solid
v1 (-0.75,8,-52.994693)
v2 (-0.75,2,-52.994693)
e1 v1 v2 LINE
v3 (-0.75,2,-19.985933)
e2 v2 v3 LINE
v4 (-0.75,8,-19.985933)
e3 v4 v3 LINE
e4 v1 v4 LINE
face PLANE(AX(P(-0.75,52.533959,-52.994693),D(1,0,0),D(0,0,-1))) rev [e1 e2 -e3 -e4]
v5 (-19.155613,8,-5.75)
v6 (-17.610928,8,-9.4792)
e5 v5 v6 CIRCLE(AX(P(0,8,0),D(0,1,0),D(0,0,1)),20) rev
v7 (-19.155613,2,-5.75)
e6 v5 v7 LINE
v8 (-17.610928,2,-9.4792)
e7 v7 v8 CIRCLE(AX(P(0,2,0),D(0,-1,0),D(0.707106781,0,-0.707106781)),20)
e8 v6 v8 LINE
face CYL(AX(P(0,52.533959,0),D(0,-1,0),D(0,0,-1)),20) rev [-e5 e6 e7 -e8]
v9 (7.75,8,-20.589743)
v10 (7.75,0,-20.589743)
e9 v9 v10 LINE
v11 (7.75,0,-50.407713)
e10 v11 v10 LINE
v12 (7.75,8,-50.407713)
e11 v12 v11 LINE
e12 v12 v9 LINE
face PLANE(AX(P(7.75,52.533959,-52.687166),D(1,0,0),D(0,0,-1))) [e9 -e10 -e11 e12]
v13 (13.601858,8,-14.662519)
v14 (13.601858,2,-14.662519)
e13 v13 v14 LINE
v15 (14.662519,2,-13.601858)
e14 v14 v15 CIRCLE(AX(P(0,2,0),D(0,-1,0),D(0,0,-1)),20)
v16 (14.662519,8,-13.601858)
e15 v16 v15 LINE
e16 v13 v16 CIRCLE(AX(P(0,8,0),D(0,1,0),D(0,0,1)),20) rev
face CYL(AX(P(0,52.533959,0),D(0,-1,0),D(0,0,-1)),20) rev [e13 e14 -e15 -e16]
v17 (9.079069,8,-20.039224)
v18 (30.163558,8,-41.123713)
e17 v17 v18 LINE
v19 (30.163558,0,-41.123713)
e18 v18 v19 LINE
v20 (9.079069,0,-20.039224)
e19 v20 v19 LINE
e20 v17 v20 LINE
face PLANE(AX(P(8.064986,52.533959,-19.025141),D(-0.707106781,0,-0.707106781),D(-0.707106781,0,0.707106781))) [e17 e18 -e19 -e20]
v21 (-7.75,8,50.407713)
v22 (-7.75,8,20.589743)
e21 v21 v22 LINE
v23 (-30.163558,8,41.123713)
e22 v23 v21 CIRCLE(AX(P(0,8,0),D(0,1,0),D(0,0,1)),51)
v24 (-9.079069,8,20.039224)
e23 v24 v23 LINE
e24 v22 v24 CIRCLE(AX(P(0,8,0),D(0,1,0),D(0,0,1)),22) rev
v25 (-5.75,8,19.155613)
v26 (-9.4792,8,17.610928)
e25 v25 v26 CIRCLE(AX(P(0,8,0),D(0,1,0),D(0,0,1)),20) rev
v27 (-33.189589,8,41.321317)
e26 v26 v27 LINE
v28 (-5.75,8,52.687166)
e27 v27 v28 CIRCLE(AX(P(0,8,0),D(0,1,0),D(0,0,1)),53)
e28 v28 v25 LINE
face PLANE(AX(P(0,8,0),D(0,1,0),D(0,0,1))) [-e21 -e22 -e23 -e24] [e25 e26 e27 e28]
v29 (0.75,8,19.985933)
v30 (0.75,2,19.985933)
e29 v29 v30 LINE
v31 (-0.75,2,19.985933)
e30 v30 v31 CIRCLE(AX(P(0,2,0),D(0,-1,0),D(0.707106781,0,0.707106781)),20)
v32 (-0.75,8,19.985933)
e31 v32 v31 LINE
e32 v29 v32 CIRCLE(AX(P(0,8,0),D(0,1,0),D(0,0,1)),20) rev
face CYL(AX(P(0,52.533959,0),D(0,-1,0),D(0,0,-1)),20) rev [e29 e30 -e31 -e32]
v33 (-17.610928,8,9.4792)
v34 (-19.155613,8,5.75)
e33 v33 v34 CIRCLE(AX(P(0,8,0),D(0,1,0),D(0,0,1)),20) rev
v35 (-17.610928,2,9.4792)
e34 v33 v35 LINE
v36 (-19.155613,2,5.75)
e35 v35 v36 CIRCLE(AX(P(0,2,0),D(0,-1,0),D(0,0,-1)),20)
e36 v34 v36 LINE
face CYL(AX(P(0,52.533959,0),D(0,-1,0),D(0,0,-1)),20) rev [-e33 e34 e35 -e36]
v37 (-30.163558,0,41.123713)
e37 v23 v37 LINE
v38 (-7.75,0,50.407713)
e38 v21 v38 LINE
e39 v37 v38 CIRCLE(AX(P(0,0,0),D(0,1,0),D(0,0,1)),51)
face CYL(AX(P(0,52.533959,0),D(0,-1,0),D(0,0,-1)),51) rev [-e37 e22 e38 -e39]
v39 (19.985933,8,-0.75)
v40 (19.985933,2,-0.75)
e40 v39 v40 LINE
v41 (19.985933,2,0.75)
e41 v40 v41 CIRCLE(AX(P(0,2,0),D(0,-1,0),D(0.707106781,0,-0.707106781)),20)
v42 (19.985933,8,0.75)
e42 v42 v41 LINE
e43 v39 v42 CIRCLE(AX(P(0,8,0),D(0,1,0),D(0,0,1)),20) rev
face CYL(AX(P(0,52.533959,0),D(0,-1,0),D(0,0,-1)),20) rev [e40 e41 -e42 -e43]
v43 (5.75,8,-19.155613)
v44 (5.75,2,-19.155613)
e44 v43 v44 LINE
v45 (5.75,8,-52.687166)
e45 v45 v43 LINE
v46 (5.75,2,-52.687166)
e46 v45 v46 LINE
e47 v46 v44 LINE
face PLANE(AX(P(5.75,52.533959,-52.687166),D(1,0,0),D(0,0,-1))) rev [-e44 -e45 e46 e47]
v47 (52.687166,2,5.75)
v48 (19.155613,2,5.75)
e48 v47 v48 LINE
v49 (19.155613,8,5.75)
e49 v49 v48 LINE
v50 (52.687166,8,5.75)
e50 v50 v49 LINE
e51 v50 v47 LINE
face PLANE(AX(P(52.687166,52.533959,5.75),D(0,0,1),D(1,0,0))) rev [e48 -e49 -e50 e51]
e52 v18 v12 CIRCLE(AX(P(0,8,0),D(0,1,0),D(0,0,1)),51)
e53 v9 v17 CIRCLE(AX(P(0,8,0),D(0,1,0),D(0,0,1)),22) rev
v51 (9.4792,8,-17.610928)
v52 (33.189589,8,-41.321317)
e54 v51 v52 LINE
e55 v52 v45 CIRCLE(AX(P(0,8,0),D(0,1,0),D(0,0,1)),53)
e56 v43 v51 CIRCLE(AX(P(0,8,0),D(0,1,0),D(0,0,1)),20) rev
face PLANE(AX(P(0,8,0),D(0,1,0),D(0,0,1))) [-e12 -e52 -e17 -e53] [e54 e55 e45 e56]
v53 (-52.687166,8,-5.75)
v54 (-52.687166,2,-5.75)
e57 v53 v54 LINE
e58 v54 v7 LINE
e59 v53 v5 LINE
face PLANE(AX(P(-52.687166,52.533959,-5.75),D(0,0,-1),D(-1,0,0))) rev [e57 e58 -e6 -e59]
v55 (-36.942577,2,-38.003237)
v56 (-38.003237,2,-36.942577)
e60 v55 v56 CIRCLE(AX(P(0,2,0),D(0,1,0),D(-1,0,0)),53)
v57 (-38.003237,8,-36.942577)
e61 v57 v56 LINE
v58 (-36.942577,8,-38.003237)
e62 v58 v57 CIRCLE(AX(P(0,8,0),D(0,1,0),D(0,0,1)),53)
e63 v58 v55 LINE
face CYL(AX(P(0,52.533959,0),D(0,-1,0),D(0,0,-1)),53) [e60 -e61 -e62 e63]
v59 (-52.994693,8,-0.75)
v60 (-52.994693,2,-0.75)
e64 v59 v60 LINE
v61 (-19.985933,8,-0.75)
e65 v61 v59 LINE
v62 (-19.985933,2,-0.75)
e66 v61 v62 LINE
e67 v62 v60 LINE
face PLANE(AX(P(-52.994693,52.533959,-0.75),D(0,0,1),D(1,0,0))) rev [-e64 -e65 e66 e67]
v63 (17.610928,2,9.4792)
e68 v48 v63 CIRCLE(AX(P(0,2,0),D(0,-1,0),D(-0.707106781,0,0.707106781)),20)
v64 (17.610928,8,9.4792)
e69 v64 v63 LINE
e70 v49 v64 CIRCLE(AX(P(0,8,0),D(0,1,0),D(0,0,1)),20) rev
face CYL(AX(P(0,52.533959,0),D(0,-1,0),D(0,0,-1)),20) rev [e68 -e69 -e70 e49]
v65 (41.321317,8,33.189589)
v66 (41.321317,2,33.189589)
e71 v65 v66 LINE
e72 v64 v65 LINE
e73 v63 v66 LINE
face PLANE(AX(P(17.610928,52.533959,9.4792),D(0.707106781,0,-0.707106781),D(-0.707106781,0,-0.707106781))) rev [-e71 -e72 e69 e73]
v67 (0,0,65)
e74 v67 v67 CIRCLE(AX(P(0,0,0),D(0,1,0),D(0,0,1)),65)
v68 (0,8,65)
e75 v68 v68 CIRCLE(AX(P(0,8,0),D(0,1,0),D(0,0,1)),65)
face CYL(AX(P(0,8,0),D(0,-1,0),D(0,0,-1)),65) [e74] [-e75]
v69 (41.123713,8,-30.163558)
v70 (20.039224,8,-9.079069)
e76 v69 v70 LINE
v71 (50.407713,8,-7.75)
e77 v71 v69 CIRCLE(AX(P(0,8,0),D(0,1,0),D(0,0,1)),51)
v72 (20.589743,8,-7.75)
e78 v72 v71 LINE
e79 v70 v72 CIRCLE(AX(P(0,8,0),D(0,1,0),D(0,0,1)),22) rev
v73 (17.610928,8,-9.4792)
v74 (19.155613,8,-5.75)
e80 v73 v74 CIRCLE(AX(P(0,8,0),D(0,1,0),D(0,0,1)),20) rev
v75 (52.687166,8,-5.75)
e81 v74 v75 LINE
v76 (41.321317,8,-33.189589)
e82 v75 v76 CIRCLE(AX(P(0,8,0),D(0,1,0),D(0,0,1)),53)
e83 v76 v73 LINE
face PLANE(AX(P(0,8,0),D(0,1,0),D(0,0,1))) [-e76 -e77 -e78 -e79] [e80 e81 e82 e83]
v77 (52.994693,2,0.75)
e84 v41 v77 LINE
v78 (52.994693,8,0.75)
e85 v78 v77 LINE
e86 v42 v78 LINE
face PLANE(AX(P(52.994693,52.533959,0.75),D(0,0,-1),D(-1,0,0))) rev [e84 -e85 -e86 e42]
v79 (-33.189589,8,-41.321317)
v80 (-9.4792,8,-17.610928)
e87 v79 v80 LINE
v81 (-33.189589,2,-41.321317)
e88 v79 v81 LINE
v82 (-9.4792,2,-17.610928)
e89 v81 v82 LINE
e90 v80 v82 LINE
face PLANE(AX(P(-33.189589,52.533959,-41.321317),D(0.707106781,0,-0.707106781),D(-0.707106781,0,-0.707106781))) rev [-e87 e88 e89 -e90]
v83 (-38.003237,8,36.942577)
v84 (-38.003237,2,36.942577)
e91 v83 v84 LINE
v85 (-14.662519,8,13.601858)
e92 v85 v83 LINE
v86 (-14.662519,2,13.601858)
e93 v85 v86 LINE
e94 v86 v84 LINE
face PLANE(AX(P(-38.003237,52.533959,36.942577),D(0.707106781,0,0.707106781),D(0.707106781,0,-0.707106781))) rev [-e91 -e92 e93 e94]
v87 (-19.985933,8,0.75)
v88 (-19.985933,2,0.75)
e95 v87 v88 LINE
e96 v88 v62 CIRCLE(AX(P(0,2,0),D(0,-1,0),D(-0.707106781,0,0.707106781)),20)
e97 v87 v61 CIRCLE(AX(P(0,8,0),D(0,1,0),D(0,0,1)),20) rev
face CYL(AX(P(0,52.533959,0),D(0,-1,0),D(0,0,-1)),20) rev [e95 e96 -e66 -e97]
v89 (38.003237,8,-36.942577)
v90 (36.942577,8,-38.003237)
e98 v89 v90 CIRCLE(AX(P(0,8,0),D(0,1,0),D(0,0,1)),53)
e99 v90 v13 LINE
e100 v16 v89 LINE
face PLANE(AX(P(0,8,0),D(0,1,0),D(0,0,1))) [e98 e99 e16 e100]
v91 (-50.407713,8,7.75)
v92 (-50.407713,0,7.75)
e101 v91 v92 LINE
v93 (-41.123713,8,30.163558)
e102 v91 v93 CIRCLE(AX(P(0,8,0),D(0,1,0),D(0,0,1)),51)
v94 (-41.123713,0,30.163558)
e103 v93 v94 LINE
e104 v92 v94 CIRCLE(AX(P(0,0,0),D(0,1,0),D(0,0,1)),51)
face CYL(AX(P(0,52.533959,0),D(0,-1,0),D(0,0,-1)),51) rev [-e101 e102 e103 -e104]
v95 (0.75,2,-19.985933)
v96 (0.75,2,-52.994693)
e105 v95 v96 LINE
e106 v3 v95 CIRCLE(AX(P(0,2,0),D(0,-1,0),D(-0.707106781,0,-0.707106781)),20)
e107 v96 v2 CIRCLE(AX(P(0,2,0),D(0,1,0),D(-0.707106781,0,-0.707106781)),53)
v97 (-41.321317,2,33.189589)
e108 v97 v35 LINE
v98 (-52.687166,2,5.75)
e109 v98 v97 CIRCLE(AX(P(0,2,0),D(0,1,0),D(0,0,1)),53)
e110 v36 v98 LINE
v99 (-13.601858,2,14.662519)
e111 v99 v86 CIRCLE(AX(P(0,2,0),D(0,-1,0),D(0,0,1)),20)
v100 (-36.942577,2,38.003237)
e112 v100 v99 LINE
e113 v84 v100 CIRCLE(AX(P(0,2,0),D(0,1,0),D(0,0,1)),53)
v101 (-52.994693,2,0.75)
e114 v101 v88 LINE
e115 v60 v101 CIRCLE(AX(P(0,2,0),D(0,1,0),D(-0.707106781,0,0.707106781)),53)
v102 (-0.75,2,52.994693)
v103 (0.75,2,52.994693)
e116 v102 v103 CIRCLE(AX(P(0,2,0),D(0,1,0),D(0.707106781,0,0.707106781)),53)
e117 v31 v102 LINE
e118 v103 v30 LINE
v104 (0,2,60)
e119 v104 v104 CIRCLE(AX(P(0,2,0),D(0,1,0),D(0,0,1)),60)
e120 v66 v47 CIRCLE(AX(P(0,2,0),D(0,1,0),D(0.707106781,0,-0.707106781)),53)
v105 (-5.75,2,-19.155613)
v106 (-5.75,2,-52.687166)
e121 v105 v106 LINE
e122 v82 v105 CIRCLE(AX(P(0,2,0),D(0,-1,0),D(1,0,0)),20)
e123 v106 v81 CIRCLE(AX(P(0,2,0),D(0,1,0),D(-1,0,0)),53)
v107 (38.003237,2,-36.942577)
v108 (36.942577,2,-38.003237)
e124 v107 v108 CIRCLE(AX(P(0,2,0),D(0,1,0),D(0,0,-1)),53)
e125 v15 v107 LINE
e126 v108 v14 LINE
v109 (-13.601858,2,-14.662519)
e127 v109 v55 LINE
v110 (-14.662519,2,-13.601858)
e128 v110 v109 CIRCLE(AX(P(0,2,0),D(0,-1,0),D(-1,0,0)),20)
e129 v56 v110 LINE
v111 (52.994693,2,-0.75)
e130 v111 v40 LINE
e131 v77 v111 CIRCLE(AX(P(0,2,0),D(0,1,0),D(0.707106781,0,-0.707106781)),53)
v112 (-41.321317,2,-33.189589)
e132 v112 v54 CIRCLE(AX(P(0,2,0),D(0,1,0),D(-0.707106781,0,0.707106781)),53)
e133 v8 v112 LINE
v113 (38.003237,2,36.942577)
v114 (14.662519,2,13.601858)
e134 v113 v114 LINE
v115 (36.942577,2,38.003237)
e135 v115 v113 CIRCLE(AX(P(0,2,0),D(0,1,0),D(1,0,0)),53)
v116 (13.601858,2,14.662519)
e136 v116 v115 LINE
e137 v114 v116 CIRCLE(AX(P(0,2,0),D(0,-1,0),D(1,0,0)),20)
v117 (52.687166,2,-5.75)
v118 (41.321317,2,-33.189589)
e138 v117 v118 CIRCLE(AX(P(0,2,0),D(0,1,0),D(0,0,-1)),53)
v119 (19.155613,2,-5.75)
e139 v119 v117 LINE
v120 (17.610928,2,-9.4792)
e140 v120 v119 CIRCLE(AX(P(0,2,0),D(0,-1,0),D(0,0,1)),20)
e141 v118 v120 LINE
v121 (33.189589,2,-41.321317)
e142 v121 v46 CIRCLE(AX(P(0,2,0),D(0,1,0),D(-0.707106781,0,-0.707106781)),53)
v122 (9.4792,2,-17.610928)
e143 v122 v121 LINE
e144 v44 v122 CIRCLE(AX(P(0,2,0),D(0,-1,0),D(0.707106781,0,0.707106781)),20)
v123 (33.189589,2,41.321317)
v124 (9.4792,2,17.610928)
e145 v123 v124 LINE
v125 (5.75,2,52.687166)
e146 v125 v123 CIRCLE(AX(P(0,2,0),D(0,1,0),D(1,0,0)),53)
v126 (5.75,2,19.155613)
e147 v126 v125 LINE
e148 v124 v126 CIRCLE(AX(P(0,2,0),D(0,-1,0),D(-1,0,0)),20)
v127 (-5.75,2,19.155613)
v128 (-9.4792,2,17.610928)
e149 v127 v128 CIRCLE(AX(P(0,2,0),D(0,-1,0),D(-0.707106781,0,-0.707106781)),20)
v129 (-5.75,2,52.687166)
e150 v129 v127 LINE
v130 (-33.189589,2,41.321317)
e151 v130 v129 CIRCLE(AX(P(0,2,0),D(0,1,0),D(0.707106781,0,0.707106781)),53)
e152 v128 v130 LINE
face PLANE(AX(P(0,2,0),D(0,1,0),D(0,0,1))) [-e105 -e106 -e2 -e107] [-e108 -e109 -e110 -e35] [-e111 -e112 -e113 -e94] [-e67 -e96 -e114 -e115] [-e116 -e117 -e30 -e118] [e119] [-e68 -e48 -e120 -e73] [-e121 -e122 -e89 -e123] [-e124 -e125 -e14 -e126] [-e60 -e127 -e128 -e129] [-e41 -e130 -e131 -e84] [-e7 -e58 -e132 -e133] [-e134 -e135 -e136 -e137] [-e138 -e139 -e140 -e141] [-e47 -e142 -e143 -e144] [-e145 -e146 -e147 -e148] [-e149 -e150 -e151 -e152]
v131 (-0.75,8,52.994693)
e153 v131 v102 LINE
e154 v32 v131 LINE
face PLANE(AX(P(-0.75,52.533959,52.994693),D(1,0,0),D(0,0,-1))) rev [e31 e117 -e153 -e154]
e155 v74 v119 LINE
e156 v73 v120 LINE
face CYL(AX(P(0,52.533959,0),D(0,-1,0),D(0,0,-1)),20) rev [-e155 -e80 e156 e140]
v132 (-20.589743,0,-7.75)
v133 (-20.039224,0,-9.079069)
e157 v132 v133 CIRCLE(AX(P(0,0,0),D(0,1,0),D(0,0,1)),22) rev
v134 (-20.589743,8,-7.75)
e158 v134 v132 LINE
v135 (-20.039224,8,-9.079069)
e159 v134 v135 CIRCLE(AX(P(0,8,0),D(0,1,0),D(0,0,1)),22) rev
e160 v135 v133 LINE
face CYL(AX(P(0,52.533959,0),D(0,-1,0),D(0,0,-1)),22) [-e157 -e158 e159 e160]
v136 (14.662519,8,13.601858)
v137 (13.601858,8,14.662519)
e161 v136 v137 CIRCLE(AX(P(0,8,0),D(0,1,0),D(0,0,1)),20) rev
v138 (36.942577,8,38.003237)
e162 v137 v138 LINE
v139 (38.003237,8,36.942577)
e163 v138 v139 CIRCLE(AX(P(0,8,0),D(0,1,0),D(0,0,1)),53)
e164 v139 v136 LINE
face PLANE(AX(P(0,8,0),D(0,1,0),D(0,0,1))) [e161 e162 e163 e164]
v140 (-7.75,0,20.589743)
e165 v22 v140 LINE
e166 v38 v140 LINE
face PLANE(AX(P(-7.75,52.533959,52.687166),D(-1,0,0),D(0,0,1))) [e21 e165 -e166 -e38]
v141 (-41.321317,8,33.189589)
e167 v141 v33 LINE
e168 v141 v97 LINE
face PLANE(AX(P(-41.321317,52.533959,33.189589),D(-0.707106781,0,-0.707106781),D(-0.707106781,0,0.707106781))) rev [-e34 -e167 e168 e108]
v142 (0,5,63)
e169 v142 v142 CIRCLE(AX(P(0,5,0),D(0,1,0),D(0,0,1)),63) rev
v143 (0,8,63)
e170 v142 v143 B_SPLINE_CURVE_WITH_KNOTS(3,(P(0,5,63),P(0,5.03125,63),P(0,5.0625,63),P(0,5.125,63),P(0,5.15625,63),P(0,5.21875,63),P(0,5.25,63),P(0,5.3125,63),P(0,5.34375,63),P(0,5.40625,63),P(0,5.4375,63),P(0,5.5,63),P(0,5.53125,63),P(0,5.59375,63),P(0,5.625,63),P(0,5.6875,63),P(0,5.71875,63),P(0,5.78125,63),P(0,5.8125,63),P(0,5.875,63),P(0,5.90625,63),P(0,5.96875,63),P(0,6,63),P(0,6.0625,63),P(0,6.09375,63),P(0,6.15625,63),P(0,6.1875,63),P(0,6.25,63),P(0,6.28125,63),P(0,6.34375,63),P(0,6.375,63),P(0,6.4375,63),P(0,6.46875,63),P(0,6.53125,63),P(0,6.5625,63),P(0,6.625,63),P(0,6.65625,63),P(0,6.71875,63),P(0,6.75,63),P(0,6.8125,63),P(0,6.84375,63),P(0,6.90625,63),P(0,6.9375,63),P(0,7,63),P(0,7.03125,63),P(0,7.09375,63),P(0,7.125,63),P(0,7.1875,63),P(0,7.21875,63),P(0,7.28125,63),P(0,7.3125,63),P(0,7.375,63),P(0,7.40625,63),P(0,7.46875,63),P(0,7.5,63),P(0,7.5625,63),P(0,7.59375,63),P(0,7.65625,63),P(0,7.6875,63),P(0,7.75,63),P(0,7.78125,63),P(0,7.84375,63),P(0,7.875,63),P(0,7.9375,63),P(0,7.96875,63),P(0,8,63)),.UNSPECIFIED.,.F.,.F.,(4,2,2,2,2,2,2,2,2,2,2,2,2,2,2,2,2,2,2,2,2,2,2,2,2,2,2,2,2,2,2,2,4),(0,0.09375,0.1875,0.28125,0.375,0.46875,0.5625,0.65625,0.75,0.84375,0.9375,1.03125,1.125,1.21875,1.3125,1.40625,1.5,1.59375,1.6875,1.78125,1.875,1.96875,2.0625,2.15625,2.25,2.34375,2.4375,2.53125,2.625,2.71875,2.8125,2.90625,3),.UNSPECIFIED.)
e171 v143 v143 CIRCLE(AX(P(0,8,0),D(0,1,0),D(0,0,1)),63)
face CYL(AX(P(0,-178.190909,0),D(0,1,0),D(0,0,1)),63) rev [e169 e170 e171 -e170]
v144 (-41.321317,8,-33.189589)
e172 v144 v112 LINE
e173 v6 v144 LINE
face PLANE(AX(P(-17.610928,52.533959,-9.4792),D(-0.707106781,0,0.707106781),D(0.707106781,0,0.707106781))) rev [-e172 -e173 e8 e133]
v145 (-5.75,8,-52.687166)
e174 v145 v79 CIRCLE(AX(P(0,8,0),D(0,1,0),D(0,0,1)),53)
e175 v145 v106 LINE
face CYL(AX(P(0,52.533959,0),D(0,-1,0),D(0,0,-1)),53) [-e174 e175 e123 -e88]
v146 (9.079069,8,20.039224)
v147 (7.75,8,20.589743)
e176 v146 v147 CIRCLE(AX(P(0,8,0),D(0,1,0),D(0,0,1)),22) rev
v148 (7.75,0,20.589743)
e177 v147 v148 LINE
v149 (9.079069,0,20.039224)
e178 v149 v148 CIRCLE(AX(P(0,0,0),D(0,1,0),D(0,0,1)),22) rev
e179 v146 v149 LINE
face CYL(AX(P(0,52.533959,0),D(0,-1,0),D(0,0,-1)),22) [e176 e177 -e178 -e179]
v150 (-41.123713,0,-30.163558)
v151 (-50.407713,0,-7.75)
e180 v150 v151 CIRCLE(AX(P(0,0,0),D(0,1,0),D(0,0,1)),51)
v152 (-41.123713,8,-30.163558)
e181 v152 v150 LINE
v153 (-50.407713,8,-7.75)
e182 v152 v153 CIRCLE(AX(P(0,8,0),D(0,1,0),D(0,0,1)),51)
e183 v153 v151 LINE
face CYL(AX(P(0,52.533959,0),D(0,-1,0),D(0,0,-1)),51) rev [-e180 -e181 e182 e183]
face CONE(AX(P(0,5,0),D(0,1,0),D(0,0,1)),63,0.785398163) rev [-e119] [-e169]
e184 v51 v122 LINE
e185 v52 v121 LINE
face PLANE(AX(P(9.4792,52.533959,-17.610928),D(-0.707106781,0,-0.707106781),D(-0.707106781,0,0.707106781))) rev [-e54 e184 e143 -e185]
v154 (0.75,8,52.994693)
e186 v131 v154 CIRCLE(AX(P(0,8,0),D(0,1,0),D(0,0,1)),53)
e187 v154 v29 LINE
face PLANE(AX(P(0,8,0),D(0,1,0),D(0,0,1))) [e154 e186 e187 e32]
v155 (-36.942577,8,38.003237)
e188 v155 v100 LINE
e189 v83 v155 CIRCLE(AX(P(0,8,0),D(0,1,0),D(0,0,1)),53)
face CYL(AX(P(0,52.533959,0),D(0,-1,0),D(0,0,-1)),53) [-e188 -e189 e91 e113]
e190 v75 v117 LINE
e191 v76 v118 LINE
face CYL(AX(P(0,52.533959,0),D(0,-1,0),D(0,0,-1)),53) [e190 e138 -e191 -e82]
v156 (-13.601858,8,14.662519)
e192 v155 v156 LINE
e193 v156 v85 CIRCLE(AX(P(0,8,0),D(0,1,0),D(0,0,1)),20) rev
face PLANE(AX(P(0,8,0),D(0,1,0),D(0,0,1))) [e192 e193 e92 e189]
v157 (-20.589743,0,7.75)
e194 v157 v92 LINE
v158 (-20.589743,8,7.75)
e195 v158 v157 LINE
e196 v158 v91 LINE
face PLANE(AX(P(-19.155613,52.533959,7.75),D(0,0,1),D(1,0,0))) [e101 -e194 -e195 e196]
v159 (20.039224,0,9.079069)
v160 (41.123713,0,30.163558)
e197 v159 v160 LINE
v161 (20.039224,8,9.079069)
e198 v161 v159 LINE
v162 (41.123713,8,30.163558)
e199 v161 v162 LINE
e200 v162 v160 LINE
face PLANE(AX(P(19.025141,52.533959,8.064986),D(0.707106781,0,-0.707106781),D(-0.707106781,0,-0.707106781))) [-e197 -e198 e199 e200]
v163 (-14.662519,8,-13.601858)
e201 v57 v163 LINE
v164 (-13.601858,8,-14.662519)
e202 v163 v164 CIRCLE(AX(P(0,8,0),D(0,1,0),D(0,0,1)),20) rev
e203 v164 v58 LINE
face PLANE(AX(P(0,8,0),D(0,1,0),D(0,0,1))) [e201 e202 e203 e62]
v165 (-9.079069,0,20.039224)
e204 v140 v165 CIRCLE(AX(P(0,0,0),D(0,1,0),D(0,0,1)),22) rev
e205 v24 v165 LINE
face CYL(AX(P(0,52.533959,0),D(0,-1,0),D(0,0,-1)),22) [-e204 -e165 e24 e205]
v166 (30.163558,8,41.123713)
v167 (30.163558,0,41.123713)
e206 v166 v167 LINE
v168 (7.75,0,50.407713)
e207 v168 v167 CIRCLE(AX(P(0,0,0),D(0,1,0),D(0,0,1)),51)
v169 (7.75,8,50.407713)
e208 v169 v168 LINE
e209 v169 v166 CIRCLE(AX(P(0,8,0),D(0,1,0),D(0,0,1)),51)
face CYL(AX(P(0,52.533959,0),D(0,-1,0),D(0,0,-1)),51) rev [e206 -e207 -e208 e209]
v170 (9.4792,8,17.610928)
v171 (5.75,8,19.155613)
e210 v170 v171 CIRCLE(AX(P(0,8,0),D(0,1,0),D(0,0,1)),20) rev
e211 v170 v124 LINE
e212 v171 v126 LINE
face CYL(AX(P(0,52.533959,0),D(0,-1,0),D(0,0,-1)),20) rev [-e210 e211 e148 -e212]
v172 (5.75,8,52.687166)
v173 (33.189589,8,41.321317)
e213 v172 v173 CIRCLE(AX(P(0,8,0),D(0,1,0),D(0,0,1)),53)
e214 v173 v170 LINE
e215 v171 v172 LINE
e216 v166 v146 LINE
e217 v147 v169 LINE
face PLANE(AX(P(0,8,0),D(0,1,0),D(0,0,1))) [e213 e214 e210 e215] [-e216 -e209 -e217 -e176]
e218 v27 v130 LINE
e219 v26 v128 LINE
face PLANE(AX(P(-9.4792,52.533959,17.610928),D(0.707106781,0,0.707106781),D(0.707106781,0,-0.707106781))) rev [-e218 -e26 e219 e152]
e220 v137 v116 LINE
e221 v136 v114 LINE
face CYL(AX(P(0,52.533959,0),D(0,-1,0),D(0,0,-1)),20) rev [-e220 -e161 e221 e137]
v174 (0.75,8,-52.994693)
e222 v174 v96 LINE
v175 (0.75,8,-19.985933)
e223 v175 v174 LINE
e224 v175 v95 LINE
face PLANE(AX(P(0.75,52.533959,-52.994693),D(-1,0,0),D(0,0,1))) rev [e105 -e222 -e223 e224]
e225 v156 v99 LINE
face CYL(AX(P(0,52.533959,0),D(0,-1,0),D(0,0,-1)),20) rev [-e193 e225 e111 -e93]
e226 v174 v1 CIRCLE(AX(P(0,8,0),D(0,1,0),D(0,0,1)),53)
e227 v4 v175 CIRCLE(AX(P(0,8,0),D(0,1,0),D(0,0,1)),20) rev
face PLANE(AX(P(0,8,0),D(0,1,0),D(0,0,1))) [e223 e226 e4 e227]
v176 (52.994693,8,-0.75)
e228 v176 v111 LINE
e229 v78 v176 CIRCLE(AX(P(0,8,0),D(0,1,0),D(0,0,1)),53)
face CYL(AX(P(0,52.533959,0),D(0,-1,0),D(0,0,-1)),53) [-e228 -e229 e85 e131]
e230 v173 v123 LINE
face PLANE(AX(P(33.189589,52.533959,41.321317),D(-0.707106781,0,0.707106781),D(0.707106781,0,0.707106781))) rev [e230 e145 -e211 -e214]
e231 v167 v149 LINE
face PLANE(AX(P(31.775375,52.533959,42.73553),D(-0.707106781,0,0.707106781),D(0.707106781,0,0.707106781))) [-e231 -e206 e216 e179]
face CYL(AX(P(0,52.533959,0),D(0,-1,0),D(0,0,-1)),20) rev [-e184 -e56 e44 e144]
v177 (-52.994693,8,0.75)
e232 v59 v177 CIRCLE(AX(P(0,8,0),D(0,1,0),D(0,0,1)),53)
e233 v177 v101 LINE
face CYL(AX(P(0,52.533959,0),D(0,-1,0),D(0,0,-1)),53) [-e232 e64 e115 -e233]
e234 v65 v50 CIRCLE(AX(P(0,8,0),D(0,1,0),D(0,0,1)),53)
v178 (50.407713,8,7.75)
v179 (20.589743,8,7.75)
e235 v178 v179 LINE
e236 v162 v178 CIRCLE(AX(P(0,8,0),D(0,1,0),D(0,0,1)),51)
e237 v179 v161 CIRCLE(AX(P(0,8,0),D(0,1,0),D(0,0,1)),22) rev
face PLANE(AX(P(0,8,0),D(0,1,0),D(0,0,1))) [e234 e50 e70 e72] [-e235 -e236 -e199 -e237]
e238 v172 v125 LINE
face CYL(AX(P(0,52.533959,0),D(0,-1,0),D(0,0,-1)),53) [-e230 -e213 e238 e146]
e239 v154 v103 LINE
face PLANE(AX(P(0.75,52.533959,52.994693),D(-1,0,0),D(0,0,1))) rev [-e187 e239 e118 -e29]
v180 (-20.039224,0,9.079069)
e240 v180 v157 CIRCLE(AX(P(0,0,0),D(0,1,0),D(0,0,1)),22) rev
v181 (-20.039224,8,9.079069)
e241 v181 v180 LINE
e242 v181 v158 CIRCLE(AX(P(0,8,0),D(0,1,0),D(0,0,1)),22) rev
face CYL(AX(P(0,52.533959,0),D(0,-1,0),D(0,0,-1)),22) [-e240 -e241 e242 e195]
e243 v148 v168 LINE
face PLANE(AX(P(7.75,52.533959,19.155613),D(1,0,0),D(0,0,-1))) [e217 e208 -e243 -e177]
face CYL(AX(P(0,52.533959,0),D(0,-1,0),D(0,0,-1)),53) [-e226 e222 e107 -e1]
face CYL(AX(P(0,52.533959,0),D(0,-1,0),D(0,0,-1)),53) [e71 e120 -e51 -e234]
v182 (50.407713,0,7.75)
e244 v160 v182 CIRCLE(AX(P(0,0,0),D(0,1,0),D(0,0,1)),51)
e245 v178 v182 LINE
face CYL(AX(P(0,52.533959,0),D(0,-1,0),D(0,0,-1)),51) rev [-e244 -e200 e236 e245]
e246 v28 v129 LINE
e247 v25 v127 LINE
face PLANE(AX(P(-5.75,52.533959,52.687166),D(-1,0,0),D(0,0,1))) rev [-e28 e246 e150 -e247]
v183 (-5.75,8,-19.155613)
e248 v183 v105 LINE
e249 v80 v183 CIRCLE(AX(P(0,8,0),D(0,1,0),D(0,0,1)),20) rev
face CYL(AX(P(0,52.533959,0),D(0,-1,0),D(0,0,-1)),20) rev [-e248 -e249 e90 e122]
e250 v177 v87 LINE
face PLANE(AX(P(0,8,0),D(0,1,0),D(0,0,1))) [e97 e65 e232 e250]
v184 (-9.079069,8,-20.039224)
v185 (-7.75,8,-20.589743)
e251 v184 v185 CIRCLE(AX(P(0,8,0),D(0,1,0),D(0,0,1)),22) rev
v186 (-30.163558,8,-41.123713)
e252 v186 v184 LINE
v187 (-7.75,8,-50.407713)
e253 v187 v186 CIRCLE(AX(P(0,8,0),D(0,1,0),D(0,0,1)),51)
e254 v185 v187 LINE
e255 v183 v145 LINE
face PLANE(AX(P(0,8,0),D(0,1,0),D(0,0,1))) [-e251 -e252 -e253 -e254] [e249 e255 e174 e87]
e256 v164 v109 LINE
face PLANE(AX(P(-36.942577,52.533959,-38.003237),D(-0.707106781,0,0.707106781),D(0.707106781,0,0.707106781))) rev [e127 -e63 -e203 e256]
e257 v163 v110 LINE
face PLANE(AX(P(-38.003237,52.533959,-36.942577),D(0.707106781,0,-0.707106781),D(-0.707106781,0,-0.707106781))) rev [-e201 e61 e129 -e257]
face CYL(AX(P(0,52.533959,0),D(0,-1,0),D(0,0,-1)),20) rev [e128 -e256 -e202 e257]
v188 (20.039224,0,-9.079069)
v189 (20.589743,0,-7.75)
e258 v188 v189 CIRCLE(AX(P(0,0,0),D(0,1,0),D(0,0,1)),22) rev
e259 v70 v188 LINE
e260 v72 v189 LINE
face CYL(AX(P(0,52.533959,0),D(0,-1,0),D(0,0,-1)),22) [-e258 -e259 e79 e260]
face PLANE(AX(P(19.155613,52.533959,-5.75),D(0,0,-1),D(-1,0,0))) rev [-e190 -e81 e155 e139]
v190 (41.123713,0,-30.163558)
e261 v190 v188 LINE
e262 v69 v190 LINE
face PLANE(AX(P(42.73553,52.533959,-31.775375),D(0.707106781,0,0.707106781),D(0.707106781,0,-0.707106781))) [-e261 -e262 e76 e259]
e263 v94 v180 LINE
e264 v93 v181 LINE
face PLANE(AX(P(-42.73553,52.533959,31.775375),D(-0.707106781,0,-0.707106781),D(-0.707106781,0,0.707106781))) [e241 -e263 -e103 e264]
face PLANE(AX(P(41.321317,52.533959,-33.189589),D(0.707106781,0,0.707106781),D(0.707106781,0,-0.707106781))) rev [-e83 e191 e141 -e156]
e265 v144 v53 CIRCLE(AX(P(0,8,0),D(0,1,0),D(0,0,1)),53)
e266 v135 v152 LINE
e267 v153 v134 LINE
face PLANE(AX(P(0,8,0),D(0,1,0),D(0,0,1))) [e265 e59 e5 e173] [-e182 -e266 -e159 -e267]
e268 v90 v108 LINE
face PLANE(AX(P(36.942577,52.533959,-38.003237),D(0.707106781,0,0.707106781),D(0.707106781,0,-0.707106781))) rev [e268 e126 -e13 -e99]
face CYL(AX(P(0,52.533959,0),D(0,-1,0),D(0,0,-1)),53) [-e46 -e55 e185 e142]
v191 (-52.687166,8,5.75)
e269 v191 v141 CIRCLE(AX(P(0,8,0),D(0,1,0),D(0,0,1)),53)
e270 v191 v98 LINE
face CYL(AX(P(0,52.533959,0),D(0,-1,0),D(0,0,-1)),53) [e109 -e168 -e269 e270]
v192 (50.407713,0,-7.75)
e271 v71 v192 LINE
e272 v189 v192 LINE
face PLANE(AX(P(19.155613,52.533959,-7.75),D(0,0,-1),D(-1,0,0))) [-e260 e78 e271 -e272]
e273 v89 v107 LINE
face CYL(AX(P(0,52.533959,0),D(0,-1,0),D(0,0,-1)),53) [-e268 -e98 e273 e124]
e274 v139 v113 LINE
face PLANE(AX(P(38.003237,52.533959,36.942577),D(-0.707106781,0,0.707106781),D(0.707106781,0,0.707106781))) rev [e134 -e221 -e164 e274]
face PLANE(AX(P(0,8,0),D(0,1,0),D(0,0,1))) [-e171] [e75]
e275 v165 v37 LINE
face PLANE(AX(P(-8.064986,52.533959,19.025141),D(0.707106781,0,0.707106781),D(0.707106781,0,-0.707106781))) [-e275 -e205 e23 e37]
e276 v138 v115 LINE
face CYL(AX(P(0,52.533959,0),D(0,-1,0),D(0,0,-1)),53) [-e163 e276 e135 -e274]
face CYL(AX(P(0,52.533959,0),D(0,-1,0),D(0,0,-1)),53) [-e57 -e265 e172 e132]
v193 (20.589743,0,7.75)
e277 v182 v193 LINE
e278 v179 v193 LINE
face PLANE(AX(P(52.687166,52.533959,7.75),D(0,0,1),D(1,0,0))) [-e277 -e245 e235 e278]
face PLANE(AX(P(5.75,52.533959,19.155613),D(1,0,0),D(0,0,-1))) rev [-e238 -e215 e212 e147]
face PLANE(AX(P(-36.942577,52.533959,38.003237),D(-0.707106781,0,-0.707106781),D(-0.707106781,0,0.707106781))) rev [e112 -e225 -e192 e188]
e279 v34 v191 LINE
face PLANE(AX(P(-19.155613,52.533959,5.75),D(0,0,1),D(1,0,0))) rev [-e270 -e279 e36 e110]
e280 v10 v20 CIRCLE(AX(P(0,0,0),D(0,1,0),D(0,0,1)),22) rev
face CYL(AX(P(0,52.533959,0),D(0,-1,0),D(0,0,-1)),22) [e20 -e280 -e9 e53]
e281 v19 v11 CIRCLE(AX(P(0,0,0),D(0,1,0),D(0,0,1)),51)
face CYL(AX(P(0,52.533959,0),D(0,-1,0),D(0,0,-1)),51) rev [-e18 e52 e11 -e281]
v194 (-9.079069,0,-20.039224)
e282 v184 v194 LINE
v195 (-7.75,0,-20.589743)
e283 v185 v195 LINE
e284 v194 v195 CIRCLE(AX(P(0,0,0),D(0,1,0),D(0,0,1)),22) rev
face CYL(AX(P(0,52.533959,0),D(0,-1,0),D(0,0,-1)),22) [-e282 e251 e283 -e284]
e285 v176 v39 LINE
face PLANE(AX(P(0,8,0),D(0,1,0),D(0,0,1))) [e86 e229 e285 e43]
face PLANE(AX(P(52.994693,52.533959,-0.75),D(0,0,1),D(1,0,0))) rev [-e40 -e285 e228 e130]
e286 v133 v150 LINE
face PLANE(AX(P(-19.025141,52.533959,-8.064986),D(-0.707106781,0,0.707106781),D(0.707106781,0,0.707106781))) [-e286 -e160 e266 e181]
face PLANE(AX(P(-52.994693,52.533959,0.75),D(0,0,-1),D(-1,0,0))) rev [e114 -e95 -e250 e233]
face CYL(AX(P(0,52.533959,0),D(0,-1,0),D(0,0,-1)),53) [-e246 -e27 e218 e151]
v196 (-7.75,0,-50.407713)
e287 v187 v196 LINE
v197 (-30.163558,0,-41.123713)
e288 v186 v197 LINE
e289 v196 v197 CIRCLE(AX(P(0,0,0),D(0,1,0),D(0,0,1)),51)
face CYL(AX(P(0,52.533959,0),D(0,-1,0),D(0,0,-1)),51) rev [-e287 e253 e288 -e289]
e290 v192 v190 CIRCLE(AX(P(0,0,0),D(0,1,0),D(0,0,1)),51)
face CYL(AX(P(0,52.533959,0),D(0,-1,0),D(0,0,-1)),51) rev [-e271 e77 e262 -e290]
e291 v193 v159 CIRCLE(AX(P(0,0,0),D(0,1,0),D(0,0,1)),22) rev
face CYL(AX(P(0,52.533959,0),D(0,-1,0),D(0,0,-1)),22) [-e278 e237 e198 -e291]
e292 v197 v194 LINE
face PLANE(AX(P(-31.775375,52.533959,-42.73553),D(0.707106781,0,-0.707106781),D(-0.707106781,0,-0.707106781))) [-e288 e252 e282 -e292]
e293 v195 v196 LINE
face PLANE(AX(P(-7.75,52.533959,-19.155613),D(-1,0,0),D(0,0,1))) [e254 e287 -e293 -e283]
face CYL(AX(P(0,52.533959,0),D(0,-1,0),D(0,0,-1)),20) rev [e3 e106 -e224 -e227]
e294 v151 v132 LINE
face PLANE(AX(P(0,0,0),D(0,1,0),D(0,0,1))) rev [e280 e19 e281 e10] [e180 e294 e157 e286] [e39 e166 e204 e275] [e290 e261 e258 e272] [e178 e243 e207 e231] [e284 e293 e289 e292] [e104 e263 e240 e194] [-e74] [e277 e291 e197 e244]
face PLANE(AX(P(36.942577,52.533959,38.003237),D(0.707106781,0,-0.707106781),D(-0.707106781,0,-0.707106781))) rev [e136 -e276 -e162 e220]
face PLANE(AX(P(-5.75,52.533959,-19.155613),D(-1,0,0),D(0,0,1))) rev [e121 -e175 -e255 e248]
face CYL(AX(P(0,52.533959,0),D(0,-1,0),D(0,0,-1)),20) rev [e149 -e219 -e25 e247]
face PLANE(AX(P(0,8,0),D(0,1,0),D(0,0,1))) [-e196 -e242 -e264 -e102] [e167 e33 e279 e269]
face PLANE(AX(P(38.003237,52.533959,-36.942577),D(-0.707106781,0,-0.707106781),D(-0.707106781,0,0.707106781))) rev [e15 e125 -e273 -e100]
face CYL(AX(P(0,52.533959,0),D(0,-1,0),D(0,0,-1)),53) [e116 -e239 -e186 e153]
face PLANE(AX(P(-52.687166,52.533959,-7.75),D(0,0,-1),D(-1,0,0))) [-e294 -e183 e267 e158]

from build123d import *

# Parameters (mm, degrees)
ESQUISSE1_R                  = 65
BOSS_EXTRU_1_DEPTH           = 8
ESQUISSE2_R                  = 63
ENL_V_MAT_EXTRU_1_DEPTH      = 6
BOSS_EXTRU_2_DEPTH           = 6
R_P_TITION_CIRCULAIRE1_COUNT = 8
COQUE1_DEPTH                 = 8
CHAMFER1_SIZE                = 3


# Read off the part's stored shape, not the designer's step: Coque1
with BuildPart() as part:
    # Esquisse1 → Boss.-Extru.1 (new body)
    with BuildSketch(Plane(origin=(0, 0, 0), x_dir=(1, 0, 0), z_dir=(0, 1, 0))):
        with Locations(Location((0, 0, 0), (0, 0, 270))):
            Circle(ESQUISSE1_R)
    extrude(amount=BOSS_EXTRU_1_DEPTH)

    # Esquisse2 → Enlèv. mat.-Extru.1 (cut)
    with BuildSketch(Plane(origin=(0, 8, 0), x_dir=(1, 0, 0), z_dir=(0, 1, 0))):
        with Locations(Location((0, 0, 0), (0, 0, 270))):
            Circle(ESQUISSE2_R)
    extrude(amount=-ENL_V_MAT_EXTRU_1_DEPTH, mode=Mode.SUBTRACT)

    # Esquisse3 → Boss.-Extru.2 (add)
    with BuildSketch(Plane(origin=(0, 2, 0), x_dir=(1, 0, 0), z_dir=(0, 1, 0))):
        with BuildLine():
            Line((-41.321316613, -33.189588629), (-17.610927668, -9.479199685))
            ThreePointArc((-17.610927668, -9.479199685), (-18.47759065, -7.653668647), (-19.155612754, -5.75))
            Line((-19.155612754, -5.75), (-52.687166369, -5.75))
            ThreePointArc((-52.687166369, -5.75), (-48.965615223, -20.282221915), (-41.321316613, -33.189588629))
        make_face()
        with BuildLine():
            Line((-36.942576794, -38.003236965), (-13.60185835, -14.662518522))
            ThreePointArc((-13.60185835, -14.662518522), (-14.142135624, -14.142135624), (-14.662518522, -13.60185835))
            Line((-14.662518522, -13.60185835), (-38.003236965, -36.942576794))
            ThreePointArc((-38.003236965, -36.942576794), (-37.476659403, -37.476659403), (-36.942576794, -38.003236965))
        make_face()
    boss_extru_2 = extrude(amount=BOSS_EXTRU_2_DEPTH)

    # Répétition circulaire1: Boss.-Extru.2 ×8 about axis
    r_p_tition_circulaire1_axis = Axis((0, 0, 0), (0, 1, 0))
    for i in range(1, R_P_TITION_CIRCULAIRE1_COUNT):
        add(boss_extru_2.rotate(r_p_tition_circulaire1_axis, i * 360 / R_P_TITION_CIRCULAIRE1_COUNT))

    # Coque1 outline → Coque1 (cut)
    with BuildSketch(Plane(origin=(0, 0, 0), x_dir=(1, 0, 0), z_dir=(0, 1, 0))):
        with BuildLine():
            Line((-50.407712704, 7.75), (-20.589742592, 7.75))
            ThreePointArc((-20.589742592, 7.75), (-20.325349715, 8.419035512), (-20.039224164, 9.079069055))
            Line((-20.039224164, 9.079069055), (-41.123713031, 30.163557923))
            ThreePointArc((-41.123713031, 30.163557923), (-47.117856158, 19.516855051), (-50.407712704, 7.75))
        make_face()
        with BuildLine():
            Line((20.589742592, 7.75), (50.407712704, 7.75))
            ThreePointArc((50.407712704, 7.75), (47.117856158, 19.516855051), (41.123713031, 30.163557923))
            Line((41.123713031, 30.163557923), (20.039224164, 9.079069055))
            ThreePointArc((20.039224164, 9.079069055), (20.325349715, 8.419035512), (20.589742592, 7.75))
        make_face()
        with BuildLine():
            ThreePointArc((-7.75, 50.407712704), (-19.516855051, 47.117856158), (-30.163557923, 41.123713031))
            Line((-30.163557923, 41.123713031), (-9.079069055, 20.039224164))
            ThreePointArc((-9.079069055, 20.039224164), (-8.419035512, 20.325349715), (-7.75, 20.589742592))
            Line((-7.75, 20.589742592), (-7.75, 50.407712704))
        make_face()
        with BuildLine():
            ThreePointArc((30.163557923, 41.123713031), (19.516855051, 47.117856158), (7.75, 50.407712704))
            Line((7.75, 50.407712704), (7.75, 20.589742592))
            ThreePointArc((7.75, 20.589742592), (8.419035512, 20.325349715), (9.079069055, 20.039224164))
            Line((9.079069055, 20.039224164), (30.163557923, 41.123713031))
        make_face()
        with BuildLine():
            ThreePointArc((41.123713031, -30.163557923), (47.117856158, -19.516855051), (50.407712704, -7.75))
            Line((50.407712704, -7.75), (20.589742592, -7.75))
            ThreePointArc((20.589742592, -7.75), (20.325349715, -8.419035512), (20.039224164, -9.079069055))
            Line((20.039224164, -9.079069055), (41.123713031, -30.163557923))
        make_face()
        with BuildLine():
            ThreePointArc((7.75, -50.407712704), (19.516855051, -47.117856158), (30.163557923, -41.123713031))
            Line((30.163557923, -41.123713031), (9.079069055, -20.039224164))
            ThreePointArc((9.079069055, -20.039224164), (8.419035512, -20.325349715), (7.75, -20.589742592))
            Line((7.75, -20.589742592), (7.75, -50.407712704))
        make_face()
        with BuildLine():
            ThreePointArc((-30.163557923, -41.123713031), (-19.516855051, -47.117856158), (-7.75, -50.407712704))
            Line((-7.75, -50.407712704), (-7.75, -20.589742592))
            ThreePointArc((-7.75, -20.589742592), (-8.419035512, -20.325349715), (-9.079069055, -20.039224164))
            Line((-9.079069055, -20.039224164), (-30.163557923, -41.123713031))
        make_face()
        with BuildLine():
            ThreePointArc((-50.407712704, -7.75), (-47.117856158, -19.516855051), (-41.123713031, -30.163557923))
            Line((-41.123713031, -30.163557923), (-20.039224164, -9.079069055))
            ThreePointArc((-20.039224164, -9.079069055), (-20.325349715, -8.419035512), (-20.589742592, -7.75))
            Line((-20.589742592, -7.75), (-50.407712704, -7.75))
        make_face()
    extrude(amount=COQUE1_DEPTH, mode=Mode.SUBTRACT)

    # Chamfer1
    chamfer1_edges = [part.edges().sort_by_distance(p)[0] for p in [
        (0, 2, -63),
    ]]
    chamfer(chamfer1_edges, length=CHAMFER1_SIZE)


solid = part.part
